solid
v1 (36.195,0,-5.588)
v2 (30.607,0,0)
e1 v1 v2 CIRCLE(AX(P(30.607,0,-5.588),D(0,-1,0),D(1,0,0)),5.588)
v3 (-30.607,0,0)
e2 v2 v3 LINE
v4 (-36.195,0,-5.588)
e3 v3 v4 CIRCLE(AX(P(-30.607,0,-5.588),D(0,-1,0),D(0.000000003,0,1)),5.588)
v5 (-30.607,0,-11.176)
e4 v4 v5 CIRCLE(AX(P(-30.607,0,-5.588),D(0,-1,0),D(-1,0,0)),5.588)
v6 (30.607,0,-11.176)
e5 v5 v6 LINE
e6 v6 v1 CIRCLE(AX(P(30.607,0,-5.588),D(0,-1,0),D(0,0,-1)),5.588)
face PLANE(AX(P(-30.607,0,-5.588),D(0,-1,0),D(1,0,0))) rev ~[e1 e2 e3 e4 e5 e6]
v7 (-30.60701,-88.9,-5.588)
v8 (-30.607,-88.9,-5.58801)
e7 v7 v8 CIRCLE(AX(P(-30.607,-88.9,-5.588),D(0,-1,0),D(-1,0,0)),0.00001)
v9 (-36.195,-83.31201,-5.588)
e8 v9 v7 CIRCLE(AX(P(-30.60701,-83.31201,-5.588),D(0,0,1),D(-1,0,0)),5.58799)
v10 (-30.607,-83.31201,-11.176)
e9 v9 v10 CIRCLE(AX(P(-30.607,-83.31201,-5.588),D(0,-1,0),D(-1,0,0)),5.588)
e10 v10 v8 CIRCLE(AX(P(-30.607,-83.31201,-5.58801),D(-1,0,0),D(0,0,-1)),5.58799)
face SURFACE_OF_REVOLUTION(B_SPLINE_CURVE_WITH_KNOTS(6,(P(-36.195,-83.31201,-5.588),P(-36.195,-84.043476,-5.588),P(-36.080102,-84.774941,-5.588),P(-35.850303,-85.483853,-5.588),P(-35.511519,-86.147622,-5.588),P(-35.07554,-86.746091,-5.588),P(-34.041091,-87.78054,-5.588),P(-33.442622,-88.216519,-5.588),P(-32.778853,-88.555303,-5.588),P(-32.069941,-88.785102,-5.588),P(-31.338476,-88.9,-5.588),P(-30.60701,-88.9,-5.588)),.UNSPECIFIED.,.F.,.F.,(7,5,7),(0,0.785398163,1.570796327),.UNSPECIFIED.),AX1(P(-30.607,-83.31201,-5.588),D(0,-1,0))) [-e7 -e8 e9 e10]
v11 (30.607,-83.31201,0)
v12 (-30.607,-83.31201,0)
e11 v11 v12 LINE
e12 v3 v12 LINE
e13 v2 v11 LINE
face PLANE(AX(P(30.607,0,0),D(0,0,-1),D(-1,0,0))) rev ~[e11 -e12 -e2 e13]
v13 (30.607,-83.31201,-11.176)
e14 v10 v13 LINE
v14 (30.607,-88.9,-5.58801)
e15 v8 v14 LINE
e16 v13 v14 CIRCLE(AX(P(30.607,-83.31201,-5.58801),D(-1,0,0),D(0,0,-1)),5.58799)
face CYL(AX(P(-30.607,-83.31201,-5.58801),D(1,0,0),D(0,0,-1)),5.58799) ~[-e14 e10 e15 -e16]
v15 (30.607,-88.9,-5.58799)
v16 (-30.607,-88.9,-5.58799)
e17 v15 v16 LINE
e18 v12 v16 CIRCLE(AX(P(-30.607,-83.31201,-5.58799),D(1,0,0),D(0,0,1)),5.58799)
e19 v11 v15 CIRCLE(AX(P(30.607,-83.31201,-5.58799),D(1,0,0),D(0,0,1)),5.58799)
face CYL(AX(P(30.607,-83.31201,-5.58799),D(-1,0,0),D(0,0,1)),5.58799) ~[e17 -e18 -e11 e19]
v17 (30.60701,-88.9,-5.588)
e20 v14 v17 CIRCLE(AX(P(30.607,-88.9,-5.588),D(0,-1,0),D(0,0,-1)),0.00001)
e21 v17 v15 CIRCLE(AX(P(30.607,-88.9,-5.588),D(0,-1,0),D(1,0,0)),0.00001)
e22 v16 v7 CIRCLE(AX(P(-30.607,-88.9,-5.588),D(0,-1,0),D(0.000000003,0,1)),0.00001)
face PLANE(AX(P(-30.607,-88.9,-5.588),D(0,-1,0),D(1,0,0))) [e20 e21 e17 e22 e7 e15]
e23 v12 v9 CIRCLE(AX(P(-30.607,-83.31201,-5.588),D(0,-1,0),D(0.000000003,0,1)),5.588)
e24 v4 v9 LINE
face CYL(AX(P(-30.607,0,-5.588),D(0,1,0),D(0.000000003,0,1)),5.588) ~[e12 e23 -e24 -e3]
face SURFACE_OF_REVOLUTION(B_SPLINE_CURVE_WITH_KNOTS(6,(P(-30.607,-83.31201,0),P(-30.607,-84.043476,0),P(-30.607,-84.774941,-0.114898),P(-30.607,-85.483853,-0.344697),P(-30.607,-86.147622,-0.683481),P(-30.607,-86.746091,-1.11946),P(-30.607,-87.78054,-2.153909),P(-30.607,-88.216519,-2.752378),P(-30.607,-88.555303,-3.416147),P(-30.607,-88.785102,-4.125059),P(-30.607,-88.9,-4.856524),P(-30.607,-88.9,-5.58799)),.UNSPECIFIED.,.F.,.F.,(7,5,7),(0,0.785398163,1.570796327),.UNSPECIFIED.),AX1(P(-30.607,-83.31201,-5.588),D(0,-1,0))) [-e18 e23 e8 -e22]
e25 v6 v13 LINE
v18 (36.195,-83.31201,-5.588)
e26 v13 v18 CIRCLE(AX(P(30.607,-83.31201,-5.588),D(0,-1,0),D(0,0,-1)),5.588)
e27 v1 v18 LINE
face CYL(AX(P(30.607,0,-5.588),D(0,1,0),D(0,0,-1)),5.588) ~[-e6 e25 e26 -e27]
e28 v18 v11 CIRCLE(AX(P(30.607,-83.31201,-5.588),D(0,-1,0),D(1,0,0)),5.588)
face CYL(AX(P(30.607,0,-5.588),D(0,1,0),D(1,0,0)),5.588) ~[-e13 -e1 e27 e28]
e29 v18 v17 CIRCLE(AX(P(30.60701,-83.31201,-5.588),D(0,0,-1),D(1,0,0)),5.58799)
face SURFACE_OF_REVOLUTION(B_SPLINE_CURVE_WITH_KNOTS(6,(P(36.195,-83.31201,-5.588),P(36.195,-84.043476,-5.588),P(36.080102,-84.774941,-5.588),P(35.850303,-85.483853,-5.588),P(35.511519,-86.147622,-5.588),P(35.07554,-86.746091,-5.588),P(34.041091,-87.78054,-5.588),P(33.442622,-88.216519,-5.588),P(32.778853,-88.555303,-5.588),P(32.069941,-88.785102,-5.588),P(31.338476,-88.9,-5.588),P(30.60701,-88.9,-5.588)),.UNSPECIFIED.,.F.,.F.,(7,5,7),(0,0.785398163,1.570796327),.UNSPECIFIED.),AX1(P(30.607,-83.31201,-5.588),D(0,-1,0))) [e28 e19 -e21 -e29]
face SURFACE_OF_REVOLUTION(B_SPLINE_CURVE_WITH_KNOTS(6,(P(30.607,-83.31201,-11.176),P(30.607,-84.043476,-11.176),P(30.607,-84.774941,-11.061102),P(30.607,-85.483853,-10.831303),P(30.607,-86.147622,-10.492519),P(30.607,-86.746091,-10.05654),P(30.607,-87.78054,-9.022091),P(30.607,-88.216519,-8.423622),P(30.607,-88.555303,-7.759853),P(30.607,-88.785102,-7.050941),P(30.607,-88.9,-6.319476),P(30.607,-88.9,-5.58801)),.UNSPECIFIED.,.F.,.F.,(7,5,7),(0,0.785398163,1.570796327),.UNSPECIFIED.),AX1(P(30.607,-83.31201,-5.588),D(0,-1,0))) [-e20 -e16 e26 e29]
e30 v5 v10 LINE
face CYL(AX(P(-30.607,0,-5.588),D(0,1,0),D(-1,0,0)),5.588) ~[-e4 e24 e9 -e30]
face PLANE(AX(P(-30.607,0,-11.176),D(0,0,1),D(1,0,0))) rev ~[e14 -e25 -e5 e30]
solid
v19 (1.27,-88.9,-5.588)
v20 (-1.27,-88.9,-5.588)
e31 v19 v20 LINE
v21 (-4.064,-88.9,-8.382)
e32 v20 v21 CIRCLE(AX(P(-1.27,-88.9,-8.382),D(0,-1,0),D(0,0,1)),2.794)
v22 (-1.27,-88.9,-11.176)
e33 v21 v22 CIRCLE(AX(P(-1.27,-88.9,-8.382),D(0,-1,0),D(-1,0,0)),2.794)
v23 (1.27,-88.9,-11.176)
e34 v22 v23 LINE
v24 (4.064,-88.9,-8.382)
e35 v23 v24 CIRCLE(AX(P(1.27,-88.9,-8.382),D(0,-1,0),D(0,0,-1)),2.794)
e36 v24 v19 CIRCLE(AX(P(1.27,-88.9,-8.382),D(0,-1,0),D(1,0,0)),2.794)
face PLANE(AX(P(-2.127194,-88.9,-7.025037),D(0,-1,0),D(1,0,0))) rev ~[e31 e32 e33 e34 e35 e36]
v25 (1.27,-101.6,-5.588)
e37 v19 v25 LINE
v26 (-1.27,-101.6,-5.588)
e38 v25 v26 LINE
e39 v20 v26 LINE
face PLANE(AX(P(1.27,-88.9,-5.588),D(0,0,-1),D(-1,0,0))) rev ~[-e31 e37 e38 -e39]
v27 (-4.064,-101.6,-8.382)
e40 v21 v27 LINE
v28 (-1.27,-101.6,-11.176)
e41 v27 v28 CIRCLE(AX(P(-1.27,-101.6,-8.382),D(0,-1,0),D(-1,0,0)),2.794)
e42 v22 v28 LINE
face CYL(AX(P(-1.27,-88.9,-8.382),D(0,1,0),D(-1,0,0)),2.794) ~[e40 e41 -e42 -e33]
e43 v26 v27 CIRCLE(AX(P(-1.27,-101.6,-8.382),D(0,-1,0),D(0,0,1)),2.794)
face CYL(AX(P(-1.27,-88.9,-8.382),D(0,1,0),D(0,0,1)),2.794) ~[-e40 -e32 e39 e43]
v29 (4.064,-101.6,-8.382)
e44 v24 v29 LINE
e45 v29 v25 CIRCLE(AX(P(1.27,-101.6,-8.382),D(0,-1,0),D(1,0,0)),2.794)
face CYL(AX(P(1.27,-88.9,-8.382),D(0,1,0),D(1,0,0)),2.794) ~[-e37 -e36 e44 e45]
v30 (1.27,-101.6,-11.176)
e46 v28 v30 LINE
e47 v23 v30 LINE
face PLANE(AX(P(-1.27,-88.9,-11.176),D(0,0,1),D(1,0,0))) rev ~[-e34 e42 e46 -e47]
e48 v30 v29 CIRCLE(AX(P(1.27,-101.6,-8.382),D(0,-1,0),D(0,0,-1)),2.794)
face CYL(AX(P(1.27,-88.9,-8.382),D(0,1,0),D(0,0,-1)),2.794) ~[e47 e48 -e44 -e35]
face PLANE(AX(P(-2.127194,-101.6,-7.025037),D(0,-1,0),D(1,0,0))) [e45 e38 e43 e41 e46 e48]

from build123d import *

# Parameters (mm, degrees)
F1_DEPTH = 88.9
F3_R     = 5.58799
F4_DEPTH = 12.7


# Not quite as in the source:
# - a fillet or chamfer is up to 0.001 mm smaller than in the source, because OpenCascade refuses the exact size


with BuildPart() as f1:
    # F0 (on Front) → F1 (new body)
    with BuildSketch(Plane.XZ):
        with BuildLine():
            ThreePointArc((-25.019, -5.588), (-26.6556873013, -1.6366873121), (-30.6069999848, 0))
            ThreePointArc((-30.6069999848, 0), (-34.5583126879, -1.6366873013), (-36.195, -5.588))
            ThreePointArc((-36.195, -5.588), (-34.5583126933, -9.5393126933), (-30.607, -11.176))
            ThreePointArc((-30.607, -11.176), (-26.6556873067, -9.5393126933), (-25.019, -5.588))
        make_face()
        with BuildLine():
            Line((0, -11.176), (0, 0))
            Line((0, 0), (-30.6069999848, 0))
            ThreePointArc((-30.6069999848, 0), (-26.6556873013, -1.6366873121), (-25.019, -5.588))
            ThreePointArc((-25.019, -5.588), (-26.6556873067, -9.5393126933), (-30.607, -11.176))
            Line((-30.607, -11.176), (0, -11.176))
        make_face()
        with BuildLine():
            Line((30.607, 0), (0, 0))
            Line((0, 0), (0, -11.176))
            Line((0, -11.176), (30.607, -11.176))
            ThreePointArc((30.607, -11.176), (25.019, -5.588), (30.607, 0))
        make_face()
        with BuildLine():
            ThreePointArc((36.195, -5.588), (34.5583126933, -1.6366873067), (30.607, 0))
            ThreePointArc((30.607, 0), (25.019, -5.588), (30.607, -11.176))
            ThreePointArc((30.607, -11.176), (34.5583126933, -9.5393126933), (36.195, -5.588))
        make_face()
    extrude(amount=F1_DEPTH)

    # F3 (radius 5.588 in the source; OpenCascade refuses exactly that, so slightly less here)
    f3_edges = [f1.edges().sort_by_distance(p)[0] for p in [
        (0, -88.9, 0),
        (-36.195, -88.9, -5.588),
        (36.195, -88.9, -5.588),
    ]]
    fillet(f3_edges, radius=F3_R)


with BuildPart() as f4:
    # F2 (on face) → F4 (new body)
    with BuildSketch(Plane.XZ.offset(88.9)):
        with BuildLine():
            ThreePointArc((0, -5.8933184213), (-0.6169074839, -5.6654017291), (-1.27, -5.588))
            ThreePointArc((-1.27, -5.588), (-3.2456563466, -6.4063436534), (-4.064, -8.382))
            Line((-4.064, -8.382), (-1.524, -8.382))
            ThreePointArc((-1.524, -8.382), (-1.112731206, -6.9228810878), (0, -5.8933184213))
        make_face()
        with BuildLine():
            Line((0, -5.588), (-1.27, -5.588))
            ThreePointArc((-1.27, -5.588), (-0.6169074839, -5.6654017291), (0, -5.8933184213))
            Line((0, -5.8933184213), (0, -5.588))
        make_face()
        with BuildLine():
            Line((1.27, -5.588), (0, -5.588))
            Line((0, -5.588), (0, -5.8933184213))
            ThreePointArc((0, -5.8933184213), (0.6169074839, -5.6654017291), (1.27, -5.588))
        make_face()
        with BuildLine():
            Line((-1.524, -8.382), (-4.064, -8.382))
            ThreePointArc((-4.064, -8.382), (-3.2456563466, -10.3576563466), (-1.27, -11.176))
            ThreePointArc((-1.27, -11.176), (-0.6169074839, -11.0985982709), (0, -10.8706815787))
            ThreePointArc((0, -10.8706815787), (-1.112731206, -9.8411189122), (-1.524, -8.382))
        make_face()
        with BuildLine():
            ThreePointArc((1.524, -8.382), (1.112731206, -6.9228810878), (0, -5.8933184213))
            Line((0, -5.8933184213), (0, -8.382))
            Line((0, -8.382), (1.27, -8.382))
            Line((1.27, -8.382), (1.524, -8.382))
        make_face()
        with BuildLine():
            ThreePointArc((1.27, -5.588), (0.6169074839, -5.6654017291), (0, -5.8933184213))
            ThreePointArc((0, -5.8933184213), (1.112731206, -6.9228810878), (1.524, -8.382))
            Line((1.524, -8.382), (4.064, -8.382))
            ThreePointArc((4.064, -8.382), (3.2456563466, -6.4063436534), (1.27, -5.588))
        make_face()
        with BuildLine():
            Line((0, -8.382), (0, -5.8933184213))
            ThreePointArc((0, -5.8933184213), (-1.112731206, -6.9228810878), (-1.524, -8.382))
            Line((-1.524, -8.382), (-1.27, -8.382))
            Line((-1.27, -8.382), (0, -8.382))
        make_face()
        with BuildLine():
            ThreePointArc((0, -10.8706815787), (-0.6169074839, -11.0985982709), (-1.27, -11.176))
            Line((-1.27, -11.176), (0, -11.176))
            Line((0, -11.176), (0, -10.8706815787))
        make_face()
        with BuildLine():
            Line((-1.27, -8.382), (-1.524, -8.382))
            ThreePointArc((-1.524, -8.382), (-1.112731206, -9.8411189122), (0, -10.8706815787))
            Line((0, -10.8706815787), (0, -8.382))
            Line((0, -8.382), (-1.27, -8.382))
        make_face()
        with BuildLine():
            Line((1.27, -8.382), (0, -8.382))
            Line((0, -8.382), (0, -10.8706815787))
            ThreePointArc((0, -10.8706815787), (1.112731206, -9.8411189122), (1.524, -8.382))
            Line((1.524, -8.382), (1.27, -8.382))
        make_face()
        with BuildLine():
            Line((4.064, -8.382), (1.524, -8.382))
            ThreePointArc((1.524, -8.382), (1.112731206, -9.8411189122), (0, -10.8706815787))
            ThreePointArc((0, -10.8706815787), (0.6169074839, -11.0985982709), (1.27, -11.176))
            ThreePointArc((1.27, -11.176), (3.2456563466, -10.3576563466), (4.064, -8.382))
        make_face()
        with BuildLine():
            ThreePointArc((1.27, -11.176), (0.6169074839, -11.0985982709), (0, -10.8706815787))
            Line((0, -10.8706815787), (0, -11.176))
            Line((0, -11.176), (1.27, -11.176))
        make_face()
    extrude(amount=F4_DEPTH)


solid = Compound([f1.part, f4.part])
